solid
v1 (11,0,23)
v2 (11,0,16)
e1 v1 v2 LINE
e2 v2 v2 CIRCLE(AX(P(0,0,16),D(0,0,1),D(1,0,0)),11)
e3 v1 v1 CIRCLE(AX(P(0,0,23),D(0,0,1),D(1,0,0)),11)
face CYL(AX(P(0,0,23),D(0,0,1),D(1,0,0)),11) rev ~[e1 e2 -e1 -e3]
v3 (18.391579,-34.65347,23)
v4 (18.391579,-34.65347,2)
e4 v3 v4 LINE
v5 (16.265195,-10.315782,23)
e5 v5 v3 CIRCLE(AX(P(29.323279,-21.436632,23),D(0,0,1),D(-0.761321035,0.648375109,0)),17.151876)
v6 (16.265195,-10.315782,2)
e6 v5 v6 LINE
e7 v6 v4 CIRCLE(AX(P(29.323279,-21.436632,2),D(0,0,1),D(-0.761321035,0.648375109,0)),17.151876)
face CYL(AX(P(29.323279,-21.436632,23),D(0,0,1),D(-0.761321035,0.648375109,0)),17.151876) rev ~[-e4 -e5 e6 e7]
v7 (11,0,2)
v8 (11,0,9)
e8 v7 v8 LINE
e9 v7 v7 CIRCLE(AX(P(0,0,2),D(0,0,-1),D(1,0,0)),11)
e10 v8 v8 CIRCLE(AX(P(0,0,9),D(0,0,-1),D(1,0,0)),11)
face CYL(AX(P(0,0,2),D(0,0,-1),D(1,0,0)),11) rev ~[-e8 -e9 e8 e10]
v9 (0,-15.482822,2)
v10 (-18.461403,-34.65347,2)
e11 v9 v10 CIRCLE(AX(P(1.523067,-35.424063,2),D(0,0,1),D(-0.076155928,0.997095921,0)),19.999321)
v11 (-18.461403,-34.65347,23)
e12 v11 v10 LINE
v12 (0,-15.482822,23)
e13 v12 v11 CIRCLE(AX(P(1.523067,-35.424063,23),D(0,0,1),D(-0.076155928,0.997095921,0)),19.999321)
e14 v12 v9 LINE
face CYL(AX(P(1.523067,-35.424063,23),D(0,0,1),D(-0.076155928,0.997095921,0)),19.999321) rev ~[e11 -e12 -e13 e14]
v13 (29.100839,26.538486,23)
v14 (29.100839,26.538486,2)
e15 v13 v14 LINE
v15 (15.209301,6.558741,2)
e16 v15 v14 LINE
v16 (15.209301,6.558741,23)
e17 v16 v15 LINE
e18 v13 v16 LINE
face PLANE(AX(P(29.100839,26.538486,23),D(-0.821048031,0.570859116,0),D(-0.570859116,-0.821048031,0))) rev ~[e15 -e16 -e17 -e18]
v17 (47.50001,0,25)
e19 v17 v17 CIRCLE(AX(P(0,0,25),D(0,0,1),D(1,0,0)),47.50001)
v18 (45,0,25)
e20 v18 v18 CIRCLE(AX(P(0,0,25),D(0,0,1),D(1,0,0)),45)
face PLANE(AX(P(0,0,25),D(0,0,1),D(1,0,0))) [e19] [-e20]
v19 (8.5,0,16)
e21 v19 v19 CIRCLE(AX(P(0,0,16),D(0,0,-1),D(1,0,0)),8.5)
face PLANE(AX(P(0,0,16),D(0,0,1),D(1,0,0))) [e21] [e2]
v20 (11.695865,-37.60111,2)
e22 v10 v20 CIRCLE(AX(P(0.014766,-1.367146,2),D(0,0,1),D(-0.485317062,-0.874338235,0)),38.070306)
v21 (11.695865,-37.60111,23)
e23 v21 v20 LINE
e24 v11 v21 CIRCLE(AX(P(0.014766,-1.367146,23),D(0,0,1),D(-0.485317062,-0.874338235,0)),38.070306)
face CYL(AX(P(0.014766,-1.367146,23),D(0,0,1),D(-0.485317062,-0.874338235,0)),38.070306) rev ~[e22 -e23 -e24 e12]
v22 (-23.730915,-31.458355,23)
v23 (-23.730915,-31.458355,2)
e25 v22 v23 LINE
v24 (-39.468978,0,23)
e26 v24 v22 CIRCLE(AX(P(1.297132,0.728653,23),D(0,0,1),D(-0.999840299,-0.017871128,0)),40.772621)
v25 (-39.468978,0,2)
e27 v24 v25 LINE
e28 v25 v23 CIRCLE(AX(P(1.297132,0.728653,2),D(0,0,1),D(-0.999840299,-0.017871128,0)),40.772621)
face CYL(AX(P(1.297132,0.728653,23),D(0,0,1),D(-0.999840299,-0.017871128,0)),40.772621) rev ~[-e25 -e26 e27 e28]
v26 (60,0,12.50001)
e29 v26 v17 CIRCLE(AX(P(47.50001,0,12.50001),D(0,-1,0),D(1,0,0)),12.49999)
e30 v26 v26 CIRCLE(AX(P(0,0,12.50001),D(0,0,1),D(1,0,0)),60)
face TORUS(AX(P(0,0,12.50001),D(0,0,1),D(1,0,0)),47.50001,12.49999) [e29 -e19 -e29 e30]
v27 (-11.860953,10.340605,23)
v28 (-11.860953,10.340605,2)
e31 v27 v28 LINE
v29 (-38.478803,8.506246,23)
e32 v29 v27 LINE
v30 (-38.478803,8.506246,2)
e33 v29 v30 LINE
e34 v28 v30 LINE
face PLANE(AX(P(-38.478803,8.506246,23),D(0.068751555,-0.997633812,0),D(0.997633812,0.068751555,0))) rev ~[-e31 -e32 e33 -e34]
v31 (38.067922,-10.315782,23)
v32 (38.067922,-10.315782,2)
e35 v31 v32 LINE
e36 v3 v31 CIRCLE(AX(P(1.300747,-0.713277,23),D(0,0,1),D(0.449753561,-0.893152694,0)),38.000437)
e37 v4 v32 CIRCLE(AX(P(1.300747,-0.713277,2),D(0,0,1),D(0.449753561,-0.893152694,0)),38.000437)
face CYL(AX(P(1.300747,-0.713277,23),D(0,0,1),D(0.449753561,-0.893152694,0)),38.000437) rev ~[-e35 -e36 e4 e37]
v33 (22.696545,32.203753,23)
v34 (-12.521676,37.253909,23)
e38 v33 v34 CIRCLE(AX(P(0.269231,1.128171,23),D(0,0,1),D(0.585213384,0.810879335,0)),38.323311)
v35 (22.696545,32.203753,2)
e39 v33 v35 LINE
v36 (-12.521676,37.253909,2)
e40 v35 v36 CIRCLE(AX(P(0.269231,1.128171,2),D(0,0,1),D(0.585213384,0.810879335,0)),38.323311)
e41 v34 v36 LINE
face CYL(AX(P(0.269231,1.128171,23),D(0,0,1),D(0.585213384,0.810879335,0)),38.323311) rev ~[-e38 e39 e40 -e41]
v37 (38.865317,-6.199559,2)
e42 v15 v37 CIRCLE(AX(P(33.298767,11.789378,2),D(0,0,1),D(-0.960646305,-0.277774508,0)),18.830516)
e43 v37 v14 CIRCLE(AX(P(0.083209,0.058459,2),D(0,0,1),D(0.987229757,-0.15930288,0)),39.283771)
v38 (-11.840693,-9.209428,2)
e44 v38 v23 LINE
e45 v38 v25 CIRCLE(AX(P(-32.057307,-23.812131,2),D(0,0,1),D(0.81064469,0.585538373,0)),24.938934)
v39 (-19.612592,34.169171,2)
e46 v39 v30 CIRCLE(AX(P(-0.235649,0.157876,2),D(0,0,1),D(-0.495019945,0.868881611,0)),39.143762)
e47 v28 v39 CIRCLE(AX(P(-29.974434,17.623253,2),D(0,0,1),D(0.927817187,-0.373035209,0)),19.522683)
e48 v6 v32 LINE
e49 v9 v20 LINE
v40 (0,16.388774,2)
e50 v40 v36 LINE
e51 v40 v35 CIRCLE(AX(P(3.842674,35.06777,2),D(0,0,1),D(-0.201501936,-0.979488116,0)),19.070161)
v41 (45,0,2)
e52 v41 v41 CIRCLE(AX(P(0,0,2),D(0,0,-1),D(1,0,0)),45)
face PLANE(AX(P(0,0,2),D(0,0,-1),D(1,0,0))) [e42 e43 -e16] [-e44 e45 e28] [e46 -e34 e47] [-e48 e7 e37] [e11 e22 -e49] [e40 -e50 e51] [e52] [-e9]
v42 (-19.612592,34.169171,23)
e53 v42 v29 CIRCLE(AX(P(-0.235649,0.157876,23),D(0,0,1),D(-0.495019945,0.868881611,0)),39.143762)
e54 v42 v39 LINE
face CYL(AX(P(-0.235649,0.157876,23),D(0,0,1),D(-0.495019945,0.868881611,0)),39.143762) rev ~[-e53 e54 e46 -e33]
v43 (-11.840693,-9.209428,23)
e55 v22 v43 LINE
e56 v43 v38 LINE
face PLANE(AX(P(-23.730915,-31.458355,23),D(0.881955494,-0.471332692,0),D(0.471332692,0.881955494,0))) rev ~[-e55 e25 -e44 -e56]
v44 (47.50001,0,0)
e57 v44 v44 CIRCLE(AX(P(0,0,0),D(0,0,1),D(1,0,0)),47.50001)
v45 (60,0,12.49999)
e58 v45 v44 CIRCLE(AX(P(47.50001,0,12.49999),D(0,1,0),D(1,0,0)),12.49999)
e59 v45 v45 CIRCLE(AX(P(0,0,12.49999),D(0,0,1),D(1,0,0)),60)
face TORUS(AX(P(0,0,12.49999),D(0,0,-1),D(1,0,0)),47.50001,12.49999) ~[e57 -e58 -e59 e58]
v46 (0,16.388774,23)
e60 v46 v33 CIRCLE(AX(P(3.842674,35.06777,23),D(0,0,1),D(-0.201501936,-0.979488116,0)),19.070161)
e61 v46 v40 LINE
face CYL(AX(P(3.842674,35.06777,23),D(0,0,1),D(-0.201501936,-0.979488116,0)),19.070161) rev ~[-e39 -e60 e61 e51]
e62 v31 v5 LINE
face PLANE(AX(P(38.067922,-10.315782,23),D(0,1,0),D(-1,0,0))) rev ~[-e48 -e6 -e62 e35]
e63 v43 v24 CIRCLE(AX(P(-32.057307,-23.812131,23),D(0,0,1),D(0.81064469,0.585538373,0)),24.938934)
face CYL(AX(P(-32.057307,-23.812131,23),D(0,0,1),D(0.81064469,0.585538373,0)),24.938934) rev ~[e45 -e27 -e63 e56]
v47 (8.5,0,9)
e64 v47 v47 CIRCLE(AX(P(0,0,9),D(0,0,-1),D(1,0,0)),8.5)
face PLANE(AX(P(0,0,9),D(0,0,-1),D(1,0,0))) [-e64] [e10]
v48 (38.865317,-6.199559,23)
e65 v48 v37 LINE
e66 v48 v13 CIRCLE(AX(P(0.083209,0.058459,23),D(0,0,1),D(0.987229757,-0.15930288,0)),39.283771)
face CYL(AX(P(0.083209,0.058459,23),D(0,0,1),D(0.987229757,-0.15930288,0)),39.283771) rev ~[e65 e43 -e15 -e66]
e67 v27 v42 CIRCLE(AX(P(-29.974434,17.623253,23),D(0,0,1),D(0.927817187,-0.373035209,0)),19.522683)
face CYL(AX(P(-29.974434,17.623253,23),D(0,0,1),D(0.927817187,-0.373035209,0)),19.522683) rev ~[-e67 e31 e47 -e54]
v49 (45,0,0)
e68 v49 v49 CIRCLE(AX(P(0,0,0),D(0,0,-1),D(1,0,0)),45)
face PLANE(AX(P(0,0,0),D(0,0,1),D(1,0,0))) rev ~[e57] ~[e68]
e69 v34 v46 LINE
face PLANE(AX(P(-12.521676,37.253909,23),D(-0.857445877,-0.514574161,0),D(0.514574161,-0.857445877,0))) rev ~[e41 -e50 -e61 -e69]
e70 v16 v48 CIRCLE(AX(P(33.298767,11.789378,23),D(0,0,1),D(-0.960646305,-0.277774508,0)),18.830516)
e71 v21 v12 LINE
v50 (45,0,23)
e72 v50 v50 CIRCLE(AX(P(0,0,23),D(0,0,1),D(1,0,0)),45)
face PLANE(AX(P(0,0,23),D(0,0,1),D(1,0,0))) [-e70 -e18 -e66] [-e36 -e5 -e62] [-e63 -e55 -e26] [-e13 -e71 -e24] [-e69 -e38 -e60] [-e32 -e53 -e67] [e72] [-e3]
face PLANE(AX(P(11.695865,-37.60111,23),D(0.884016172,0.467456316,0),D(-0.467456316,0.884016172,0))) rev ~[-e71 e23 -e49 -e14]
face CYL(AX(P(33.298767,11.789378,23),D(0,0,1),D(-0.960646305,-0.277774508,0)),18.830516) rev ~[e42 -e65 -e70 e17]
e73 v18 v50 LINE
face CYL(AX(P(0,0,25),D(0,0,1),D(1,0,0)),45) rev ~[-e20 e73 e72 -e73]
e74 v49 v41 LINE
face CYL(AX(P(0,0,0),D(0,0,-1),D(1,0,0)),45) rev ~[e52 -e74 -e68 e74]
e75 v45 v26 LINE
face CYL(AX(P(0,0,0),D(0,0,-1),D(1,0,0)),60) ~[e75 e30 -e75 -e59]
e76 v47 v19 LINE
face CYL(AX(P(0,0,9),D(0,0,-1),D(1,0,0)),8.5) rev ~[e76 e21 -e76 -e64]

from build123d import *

# Parameters (mm, degrees)
F0_R      = 60
F1_DEPTH  = 25
F2_R      = 45
F3_DEPTH  = 2
F4_R      = 11
F5_DEPTH  = 7
F6_R      = 45
F7_DEPTH  = 2
F8_R      = 11
F9_DEPTH  = 7
F10_R     = 8.5
F11_DEPTH = 25
F12_R     = 12.49999
F16_DEPTH = 25


# Not quite as in the source:
# - a fillet or chamfer is up to 0.001 mm smaller than in the source, because OpenCascade refuses the exact size


with BuildPart() as f1:
    # F0 (on Top) → F1 (new body)
    with BuildSketch(Plane.XY):
        Circle(F0_R)
    extrude(amount=F1_DEPTH)

    # F2 (on face) → F3 (cut)
    with BuildSketch(Plane.XY.offset(25)):
        Circle(F2_R)
    extrude(amount=-F3_DEPTH, mode=Mode.SUBTRACT)

    # F4 (on face) → F5 (cut)
    with BuildSketch(Plane.XY.offset(23)):
        Circle(F4_R)
    extrude(amount=-F5_DEPTH, mode=Mode.SUBTRACT)

    # F6 (on face) → F7 (cut)
    with BuildSketch(Plane(origin=(0, 0, 0), x_dir=(1, 0, 0), z_dir=(0, 0, -1))):
        Circle(F6_R)
    extrude(amount=-F7_DEPTH, mode=Mode.SUBTRACT)

    # F8 (on face) → F9 (cut)
    with BuildSketch(Plane(origin=(0, 0, 2), x_dir=(1, 0, 0), z_dir=(0, 0, -1))):
        Circle(F8_R)
    extrude(amount=-F9_DEPTH, mode=Mode.SUBTRACT)

    # F10 (on face) → F11 (cut)
    with BuildSketch(Plane(origin=(0, 0, 9), x_dir=(1, 0, 0), z_dir=(0, 0, -1))):
        Circle(F10_R)
    extrude(amount=-F11_DEPTH, mode=Mode.SUBTRACT)

    # F12 (radius 12.5 in the source; OpenCascade refuses exactly that, so slightly less here)
    f12_edges = [f1.edges().sort_by_distance(p)[0] for p in [
        (-60, 0, 25),
        (-60, 0, 0),
    ]]
    fillet(f12_edges, radius=F12_R)

    # F15 (on face) → F16 (cut)
    with BuildSketch(Plane.XY.offset(23)):
        with BuildLine():
            Line((-23.7309150398, -31.4583554864), (-11.8406927213, -9.2094279826))
            ThreePointArc((-11.8406927213, -9.2094279826), (-24.1709240611, -0.1529805421), (-39.4689776003, 0))
            ThreePointArc((-39.4689776003, 0), (-35.1668885168, -17.5136562569), (-23.7309150398, -31.4583554864))
        make_face()
        with BuildLine():
            Line((11.6958646104, -37.6011095941), (0, -15.4828215018))
            ThreePointArc((0, -15.4828215018), (-12.8825559704, -21.5513966495), (-18.4614025056, -34.6534699202))
            ThreePointArc((-18.4614025056, -34.6534699202), (-3.6886632813, -39.2568911162), (11.6958646104, -37.6011095941))
        make_face()
        with BuildLine():
            Line((38.0679219961, -10.3157823905), (16.2651948631, -10.3157823905))
            ThreePointArc((16.2651948631, -10.3157823905), (12.2364949642, -22.929504934), (18.3915793896, -34.6534699202))
            ThreePointArc((18.3915793896, -34.6534699202), (30.8515845586, -24.6043058224), (38.0679219961, -10.3157823905))
        make_face()
        with BuildLine():
            Line((29.1008390486, 26.5384856611), (15.2093013749, 6.5587405115))
            ThreePointArc((15.2093013749, 6.5587405115), (24.360120091, -4.7843640185), (38.8653166592, -6.1995587312))
            ThreePointArc((38.8653166592, -6.1995587312), (37.7282086233, 11.2864894274), (29.1008390486, 26.5384856611))
        make_face()
        with BuildLine():
            Line((-12.5216757879, 37.253908813), (0, 16.3887739182))
            ThreePointArc((0, 16.3887739182), (14.7450774696, 19.4214078257), (22.6965453476, 32.2037525475))
            ThreePointArc((22.6965453476, 32.2037525475), (5.7090018341, 39.0634462479), (-12.5216757879, 37.253908813))
        make_face()
        with BuildLine():
            Line((-38.4788028896, 8.5062459111), (-11.8609527126, 10.3406049311))
            ThreePointArc((-11.8609527126, 10.3406049311), (-11.4093820553, 23.6626254803), (-19.6125917137, 34.1691710055))
            ThreePointArc((-19.6125917137, 34.1691710055), (-31.7739639836, 23.3434055945), (-38.4788028896, 8.5062459111))
        make_face()
    extrude(amount=-F16_DEPTH, mode=Mode.SUBTRACT)


solid = f1.part
